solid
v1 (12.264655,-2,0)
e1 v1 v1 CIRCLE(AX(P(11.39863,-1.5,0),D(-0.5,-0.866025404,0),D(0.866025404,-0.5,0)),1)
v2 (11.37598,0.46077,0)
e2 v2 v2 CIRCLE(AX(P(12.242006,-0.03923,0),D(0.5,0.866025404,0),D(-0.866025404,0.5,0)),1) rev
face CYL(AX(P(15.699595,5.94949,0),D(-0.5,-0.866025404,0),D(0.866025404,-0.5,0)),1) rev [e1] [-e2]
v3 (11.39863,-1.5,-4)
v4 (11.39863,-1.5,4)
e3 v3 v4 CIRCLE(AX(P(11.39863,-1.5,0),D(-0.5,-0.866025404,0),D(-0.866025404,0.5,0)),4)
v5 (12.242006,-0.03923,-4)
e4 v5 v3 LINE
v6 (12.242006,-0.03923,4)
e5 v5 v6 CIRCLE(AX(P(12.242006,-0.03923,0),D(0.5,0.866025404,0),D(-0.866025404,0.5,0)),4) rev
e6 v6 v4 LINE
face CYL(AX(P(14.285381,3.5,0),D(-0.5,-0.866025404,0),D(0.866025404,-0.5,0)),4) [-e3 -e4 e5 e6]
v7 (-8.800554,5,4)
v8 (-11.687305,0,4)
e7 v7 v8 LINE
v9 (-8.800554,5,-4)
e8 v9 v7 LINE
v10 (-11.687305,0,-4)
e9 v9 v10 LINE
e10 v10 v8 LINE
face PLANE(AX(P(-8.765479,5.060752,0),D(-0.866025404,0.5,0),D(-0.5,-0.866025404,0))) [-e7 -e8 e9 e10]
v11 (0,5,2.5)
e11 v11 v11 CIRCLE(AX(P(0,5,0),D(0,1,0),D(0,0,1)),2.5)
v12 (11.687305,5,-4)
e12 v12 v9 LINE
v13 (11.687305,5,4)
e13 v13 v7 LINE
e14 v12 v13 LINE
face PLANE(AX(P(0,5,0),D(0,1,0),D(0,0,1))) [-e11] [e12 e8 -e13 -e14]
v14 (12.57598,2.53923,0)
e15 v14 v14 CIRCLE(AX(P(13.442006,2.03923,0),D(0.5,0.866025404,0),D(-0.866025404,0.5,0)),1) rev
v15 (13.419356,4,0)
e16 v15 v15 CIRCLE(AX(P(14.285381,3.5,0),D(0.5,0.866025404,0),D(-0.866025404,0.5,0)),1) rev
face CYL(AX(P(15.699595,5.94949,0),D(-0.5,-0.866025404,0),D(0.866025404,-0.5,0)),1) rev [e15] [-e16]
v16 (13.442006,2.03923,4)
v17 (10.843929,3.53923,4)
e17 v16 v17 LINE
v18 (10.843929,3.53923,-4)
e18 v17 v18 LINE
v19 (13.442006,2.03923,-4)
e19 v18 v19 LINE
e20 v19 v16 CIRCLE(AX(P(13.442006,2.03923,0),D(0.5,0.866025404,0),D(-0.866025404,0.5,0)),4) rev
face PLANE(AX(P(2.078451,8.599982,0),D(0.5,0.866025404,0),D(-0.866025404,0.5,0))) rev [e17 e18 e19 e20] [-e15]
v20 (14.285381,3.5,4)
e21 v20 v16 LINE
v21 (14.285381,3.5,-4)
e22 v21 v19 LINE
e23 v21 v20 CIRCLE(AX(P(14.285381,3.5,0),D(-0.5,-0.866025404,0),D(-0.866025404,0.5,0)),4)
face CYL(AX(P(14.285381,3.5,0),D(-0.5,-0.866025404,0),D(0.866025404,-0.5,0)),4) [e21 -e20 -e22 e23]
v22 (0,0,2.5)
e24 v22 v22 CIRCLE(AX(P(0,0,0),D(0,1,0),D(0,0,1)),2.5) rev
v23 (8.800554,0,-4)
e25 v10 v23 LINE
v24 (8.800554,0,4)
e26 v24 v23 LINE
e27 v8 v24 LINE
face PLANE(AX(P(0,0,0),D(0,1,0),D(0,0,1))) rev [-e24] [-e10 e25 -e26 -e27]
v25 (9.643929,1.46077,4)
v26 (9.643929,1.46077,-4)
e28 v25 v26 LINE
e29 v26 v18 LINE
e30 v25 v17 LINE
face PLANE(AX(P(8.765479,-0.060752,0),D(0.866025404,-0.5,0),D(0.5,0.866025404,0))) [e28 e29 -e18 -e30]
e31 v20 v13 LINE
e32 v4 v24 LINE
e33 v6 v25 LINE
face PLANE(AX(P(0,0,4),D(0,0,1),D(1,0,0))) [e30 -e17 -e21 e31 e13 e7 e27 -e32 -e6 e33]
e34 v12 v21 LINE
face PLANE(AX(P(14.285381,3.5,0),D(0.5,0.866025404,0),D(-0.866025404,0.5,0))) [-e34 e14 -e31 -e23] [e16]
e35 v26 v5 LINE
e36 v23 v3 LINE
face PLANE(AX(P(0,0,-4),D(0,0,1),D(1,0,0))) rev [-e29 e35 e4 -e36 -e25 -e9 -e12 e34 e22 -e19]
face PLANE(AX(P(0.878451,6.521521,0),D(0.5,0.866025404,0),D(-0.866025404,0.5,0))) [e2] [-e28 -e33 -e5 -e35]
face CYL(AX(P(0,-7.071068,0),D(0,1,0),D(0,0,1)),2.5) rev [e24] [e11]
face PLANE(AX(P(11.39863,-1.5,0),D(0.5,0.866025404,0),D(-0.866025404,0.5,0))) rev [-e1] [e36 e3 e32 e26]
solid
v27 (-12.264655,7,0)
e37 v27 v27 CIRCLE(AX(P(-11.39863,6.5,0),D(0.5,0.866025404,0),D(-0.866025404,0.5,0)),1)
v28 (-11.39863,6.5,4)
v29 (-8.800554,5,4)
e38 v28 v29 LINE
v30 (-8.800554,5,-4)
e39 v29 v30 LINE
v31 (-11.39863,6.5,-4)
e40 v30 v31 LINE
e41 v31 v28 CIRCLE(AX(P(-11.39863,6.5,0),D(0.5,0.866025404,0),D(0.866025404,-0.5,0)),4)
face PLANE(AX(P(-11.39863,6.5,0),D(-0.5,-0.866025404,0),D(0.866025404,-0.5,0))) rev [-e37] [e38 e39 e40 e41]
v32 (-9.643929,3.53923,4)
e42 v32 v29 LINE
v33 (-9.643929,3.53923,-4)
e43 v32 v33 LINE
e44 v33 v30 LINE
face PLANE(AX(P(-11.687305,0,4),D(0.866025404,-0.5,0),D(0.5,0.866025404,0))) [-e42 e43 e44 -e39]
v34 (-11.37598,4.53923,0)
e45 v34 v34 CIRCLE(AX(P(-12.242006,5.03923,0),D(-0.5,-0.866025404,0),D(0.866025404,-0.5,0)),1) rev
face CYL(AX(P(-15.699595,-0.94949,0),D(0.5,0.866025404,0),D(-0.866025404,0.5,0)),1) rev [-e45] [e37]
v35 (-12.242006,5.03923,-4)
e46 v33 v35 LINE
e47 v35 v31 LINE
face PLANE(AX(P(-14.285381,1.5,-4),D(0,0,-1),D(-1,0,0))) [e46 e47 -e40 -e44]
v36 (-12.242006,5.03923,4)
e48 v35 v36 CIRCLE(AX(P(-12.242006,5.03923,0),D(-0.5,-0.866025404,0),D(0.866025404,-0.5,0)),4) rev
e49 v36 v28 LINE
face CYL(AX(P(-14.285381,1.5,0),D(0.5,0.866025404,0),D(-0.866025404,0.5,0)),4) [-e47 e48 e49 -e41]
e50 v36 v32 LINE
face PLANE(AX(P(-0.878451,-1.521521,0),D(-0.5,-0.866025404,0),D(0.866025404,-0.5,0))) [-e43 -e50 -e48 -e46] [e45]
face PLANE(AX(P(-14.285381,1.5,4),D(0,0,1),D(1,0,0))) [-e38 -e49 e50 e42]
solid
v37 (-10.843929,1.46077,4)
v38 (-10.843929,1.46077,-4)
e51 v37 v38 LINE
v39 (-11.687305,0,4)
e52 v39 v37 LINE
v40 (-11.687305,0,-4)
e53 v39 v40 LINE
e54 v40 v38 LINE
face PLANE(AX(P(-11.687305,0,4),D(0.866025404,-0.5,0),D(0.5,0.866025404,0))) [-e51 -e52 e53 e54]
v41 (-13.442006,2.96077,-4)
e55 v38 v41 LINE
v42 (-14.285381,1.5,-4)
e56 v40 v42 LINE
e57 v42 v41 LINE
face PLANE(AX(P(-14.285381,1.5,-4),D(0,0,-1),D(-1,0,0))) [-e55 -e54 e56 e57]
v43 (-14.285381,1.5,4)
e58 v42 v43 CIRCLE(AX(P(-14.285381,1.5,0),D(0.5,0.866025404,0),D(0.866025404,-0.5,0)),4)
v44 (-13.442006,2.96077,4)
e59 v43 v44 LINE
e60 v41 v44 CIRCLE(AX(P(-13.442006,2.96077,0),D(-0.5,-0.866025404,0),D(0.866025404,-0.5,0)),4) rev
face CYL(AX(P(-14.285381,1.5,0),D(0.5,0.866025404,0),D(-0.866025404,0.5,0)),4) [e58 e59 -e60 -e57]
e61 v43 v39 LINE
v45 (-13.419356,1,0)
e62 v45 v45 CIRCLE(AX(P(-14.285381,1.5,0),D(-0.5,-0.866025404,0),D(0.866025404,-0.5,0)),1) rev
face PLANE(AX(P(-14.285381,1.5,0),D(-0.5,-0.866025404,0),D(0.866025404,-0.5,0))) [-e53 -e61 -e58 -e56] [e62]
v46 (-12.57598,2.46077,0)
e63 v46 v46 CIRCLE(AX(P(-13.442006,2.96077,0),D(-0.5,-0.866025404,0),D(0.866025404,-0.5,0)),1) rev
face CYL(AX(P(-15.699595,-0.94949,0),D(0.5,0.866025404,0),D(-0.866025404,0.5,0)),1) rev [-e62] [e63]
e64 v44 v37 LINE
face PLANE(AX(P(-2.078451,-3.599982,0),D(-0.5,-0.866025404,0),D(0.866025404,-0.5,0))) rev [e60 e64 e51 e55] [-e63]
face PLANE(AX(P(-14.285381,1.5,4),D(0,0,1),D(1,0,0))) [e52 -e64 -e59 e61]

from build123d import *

# Parameters (mm, degrees)
SKETCH_2_R                     = 6
EXTRUDE_1_DEPTH                = 5
SKETCH_3_R                     = 2.5
CUT_EXTRUDE_1_DEPTH            = 5
SKETCH_4_W                     = 8.617209121
SKETCH_4_H                     = 5
EXTRUDE_2_DEPTH                = 4
SKETCH_5_W                     = 17.690730237
SKETCH_5_H                     = 8.258947269
CUT_EXTRUDE_3_DEPTH            = 4.5
EXTRUDE_3_DEPTH                = 5.773503
CUT_EXTRUDE_START              = -5.773503
SKETCH_7_R                     = 1
CUT_EXTRUDE_4_DEPTH            = 5.773503
SKETCH_9_W                     = 22.757935056
SKETCH_9_H                     = 15.650140619
CUT_EXTRUDE_5_DEPTH            = 1.2
PATTERN_CIRCULAR_3_COUNT       = 2
PATTERN_START                  = 4.400276835
PATTERN_CIRCULAR_4_OUTLINE_R   = 1
PATTERN_CIRCULAR_4_DEPTH       = 1.686751346
PATTERN_START_2                = 8.487028181
PATTERN_CIRCULAR_4_2_OUTLINE_R = 1
PATTERN_CIRCULAR_4_2_DEPTH     = 1.686751346
SKETCH_10_W                    = 9.588589767
SKETCH_10_H                    = 4.25680111
SKETCH_10_W_2                  = 8.94427191
SKETCH_10_H_2                  = 4.682372666
CUT_EXTRUDE_6_DEPTH            = 10


# Read off the part's stored shape, not the designer's step: 阵列(圆周)4
with BuildPart() as part:
    # 草图2 → 凸台-拉伸1 (new body)
    with BuildSketch(Plane(origin=(0, 0, 0), x_dir=(1, 0, 0), z_dir=(0, 1, 0))):
        with Locations(Location((0, 0, 0), (0, 0, 270))):
            Circle(SKETCH_2_R)
    extrude(amount=EXTRUDE_1_DEPTH)

    # 草图3 → 切除-拉伸1 (cut)
    with BuildSketch(Plane(origin=(0, 5, 0), x_dir=(1, 0, 0), z_dir=(0, 1, 0))):
        with Locations(Location((0, 0, 0), (0, 0, 270))):
            Circle(SKETCH_3_R)
    extrude(amount=-CUT_EXTRUDE_1_DEPTH, mode=Mode.SUBTRACT)

    # 草图4 → 凸台-拉伸2 (add, symmetric)
    with BuildSketch(Plane.XY):
        with Locations((-7.378700456, 2.5)):
            Rectangle(SKETCH_4_W, SKETCH_4_H)
    extrude_2 = extrude(amount=EXTRUDE_2_DEPTH, both=True)

    # 草图5 → 切除-拉伸3 (cut)
    with BuildSketch(Plane(origin=(-8.765478763, 5.060751523, 0), x_dir=(0, 0, 1), z_dir=(0.8660254037844398, -0.499999999999998, 0))):
        with Locations((1.152187915, 4.129473635)):
            Rectangle(SKETCH_5_W, SKETCH_5_H)
    cut_extrude_3 = extrude(amount=-CUT_EXTRUDE_3_DEPTH, mode=Mode.SUBTRACT)

    # 镜向1: 凸台-拉伸2 across plane
    add(extrude_2.mirror(Plane(origin=(0, 0, 0), x_dir=(0, 0, 1), z_dir=(1, 0, 0))))

    # 阵列(圆周)3: 切除-拉伸3 ×2 about axis
    pattern_circular_3_axis = Axis((0, 2.5, -9.079549455), (0, 0, 1))
    for i in range(1, PATTERN_CIRCULAR_3_COUNT):
        add(cut_extrude_3.rotate(pattern_circular_3_axis, i * 360 / PATTERN_CIRCULAR_3_COUNT), mode=Mode.SUBTRACT)

    # 阵列(圆周)4 outline → 阵列(圆周)4 (add)
    with BuildSketch(Plane(origin=(0, 0, 0), x_dir=(0.8660254037844398, -0.499999999999998, 0), z_dir=(0.49999999999999795, 0.8660254037844399, 0)).offset(PATTERN_START)):
        with BuildLine():
            Line((10.621503046, 4), (7.621503046, 4))
            Line((7.621503046, 4), (7.621503046, -4))
            Line((7.621503046, -4), (10.621503046, -4))
            ThreePointArc((10.621503046, -4), (14.621503046, 0), (10.621503046, 4))
        make_face()
        with Locations((10.621503046, 0)):
            Circle(PATTERN_CIRCULAR_4_OUTLINE_R, mode=Mode.SUBTRACT)
    extrude(amount=PATTERN_CIRCULAR_4_DEPTH)

    # Pattern Circular 4 2 outline → Pattern Circular 4 2 (add)
    with BuildSketch(Plane(origin=(0, 0, 0), x_dir=(0.8660254037844398, -0.499999999999998, 0), z_dir=(0.49999999999999795, 0.8660254037844399, 0)).offset(PATTERN_START_2)):
        with BuildLine():
            Line((10.621503046, 4), (7.621503046, 4))
            Line((7.621503046, 4), (7.621503046, -4))
            Line((7.621503046, -4), (10.621503046, -4))
            ThreePointArc((10.621503046, -4), (14.621503046, 0), (10.621503046, 4))
        make_face()
        with Locations((10.621503046, 0)):
            Circle(PATTERN_CIRCULAR_4_2_OUTLINE_R, mode=Mode.SUBTRACT)
    extrude(amount=PATTERN_CIRCULAR_4_2_DEPTH)

    # 草图10 → 切除-拉伸6 (cut)
    with BuildSketch(Plane(origin=(0, 5, 0), x_dir=(1, 0, 0), z_dir=(0, 1, 0))):
        with Locations((-0.322158928, -6.128400555)):
            Rectangle(SKETCH_10_W, SKETCH_10_H)
        with Locations((0, 6.341186333)):
            Rectangle(SKETCH_10_W_2, SKETCH_10_H_2)
    extrude(amount=-CUT_EXTRUDE_6_DEPTH, mode=Mode.SUBTRACT)


with BuildPart() as body_2:
    # 草图6 → 凸台-拉伸3 (new body)
    with BuildSketch(Plane(origin=(-0.035074908, -0.060751523, 0), x_dir=(0, 0, 1), z_dir=(0.499999999999998, 0.8660254037844398, 0))):
        with BuildLine():
            Line((-4, -13.121503046), (-4, -10.121503046))
            Line((-4, -10.121503046), (4, -10.121503046))
            Line((4, -10.121503046), (4, -13.121503046))
            ThreePointArc((4, -13.121503046), (0, -17.121503046), (-4, -13.121503046))
        make_face()
    extrude(amount=-EXTRUDE_3_DEPTH)

    # 草图7 → 切除-拉伸4 (cut)
    with BuildSketch(Plane(origin=(-0.035074908, -0.060751523, 0), x_dir=(0.8660254037844398, -0.49999999999999806, 0), z_dir=(0.499999999999998, 0.8660254037844397, 0)).offset(CUT_EXTRUDE_START)):
        with Locations(Location((-13.121503046, 0, 0), (0, 0, 180))):
            Circle(SKETCH_7_R)
    extrude(amount=CUT_EXTRUDE_4_DEPTH, mode=Mode.SUBTRACT)

    # 草图9 → 切除-拉伸5 (cut, symmetric)
    with BuildSketch(Plane(origin=(-1.478450581, -2.560751523, 0), x_dir=(0.8660254037844398, -0.49999999999999806, 0), z_dir=(0.499999999999998, 0.8660254037844397, 0))):
        with Locations((-20.577581029, 0.471972115)):
            Rectangle(SKETCH_9_W, SKETCH_9_H)
    extrude(amount=CUT_EXTRUDE_5_DEPTH, both=True, mode=Mode.SUBTRACT)


with BuildPart() as cut_extrude_5_piece_1:
    # of the separate pieces the step leaves, piece 1, a body of its own (cut_extrude_5_pieces)
    add(body_2.part.solids().sort_by_distance((-10.843929344, 1.460769515, -4))[0])


with BuildPart() as cut_extrude_5_piece_2:
    # of the separate pieces the step leaves, piece 2, a body of its own (cut_extrude_5_pieces)
    add(body_2.part.solids().sort_by_distance((-11.398629882, 6.5, -4))[0])


solid = Compound([part.part, cut_extrude_5_piece_1.part, cut_extrude_5_piece_2.part])
